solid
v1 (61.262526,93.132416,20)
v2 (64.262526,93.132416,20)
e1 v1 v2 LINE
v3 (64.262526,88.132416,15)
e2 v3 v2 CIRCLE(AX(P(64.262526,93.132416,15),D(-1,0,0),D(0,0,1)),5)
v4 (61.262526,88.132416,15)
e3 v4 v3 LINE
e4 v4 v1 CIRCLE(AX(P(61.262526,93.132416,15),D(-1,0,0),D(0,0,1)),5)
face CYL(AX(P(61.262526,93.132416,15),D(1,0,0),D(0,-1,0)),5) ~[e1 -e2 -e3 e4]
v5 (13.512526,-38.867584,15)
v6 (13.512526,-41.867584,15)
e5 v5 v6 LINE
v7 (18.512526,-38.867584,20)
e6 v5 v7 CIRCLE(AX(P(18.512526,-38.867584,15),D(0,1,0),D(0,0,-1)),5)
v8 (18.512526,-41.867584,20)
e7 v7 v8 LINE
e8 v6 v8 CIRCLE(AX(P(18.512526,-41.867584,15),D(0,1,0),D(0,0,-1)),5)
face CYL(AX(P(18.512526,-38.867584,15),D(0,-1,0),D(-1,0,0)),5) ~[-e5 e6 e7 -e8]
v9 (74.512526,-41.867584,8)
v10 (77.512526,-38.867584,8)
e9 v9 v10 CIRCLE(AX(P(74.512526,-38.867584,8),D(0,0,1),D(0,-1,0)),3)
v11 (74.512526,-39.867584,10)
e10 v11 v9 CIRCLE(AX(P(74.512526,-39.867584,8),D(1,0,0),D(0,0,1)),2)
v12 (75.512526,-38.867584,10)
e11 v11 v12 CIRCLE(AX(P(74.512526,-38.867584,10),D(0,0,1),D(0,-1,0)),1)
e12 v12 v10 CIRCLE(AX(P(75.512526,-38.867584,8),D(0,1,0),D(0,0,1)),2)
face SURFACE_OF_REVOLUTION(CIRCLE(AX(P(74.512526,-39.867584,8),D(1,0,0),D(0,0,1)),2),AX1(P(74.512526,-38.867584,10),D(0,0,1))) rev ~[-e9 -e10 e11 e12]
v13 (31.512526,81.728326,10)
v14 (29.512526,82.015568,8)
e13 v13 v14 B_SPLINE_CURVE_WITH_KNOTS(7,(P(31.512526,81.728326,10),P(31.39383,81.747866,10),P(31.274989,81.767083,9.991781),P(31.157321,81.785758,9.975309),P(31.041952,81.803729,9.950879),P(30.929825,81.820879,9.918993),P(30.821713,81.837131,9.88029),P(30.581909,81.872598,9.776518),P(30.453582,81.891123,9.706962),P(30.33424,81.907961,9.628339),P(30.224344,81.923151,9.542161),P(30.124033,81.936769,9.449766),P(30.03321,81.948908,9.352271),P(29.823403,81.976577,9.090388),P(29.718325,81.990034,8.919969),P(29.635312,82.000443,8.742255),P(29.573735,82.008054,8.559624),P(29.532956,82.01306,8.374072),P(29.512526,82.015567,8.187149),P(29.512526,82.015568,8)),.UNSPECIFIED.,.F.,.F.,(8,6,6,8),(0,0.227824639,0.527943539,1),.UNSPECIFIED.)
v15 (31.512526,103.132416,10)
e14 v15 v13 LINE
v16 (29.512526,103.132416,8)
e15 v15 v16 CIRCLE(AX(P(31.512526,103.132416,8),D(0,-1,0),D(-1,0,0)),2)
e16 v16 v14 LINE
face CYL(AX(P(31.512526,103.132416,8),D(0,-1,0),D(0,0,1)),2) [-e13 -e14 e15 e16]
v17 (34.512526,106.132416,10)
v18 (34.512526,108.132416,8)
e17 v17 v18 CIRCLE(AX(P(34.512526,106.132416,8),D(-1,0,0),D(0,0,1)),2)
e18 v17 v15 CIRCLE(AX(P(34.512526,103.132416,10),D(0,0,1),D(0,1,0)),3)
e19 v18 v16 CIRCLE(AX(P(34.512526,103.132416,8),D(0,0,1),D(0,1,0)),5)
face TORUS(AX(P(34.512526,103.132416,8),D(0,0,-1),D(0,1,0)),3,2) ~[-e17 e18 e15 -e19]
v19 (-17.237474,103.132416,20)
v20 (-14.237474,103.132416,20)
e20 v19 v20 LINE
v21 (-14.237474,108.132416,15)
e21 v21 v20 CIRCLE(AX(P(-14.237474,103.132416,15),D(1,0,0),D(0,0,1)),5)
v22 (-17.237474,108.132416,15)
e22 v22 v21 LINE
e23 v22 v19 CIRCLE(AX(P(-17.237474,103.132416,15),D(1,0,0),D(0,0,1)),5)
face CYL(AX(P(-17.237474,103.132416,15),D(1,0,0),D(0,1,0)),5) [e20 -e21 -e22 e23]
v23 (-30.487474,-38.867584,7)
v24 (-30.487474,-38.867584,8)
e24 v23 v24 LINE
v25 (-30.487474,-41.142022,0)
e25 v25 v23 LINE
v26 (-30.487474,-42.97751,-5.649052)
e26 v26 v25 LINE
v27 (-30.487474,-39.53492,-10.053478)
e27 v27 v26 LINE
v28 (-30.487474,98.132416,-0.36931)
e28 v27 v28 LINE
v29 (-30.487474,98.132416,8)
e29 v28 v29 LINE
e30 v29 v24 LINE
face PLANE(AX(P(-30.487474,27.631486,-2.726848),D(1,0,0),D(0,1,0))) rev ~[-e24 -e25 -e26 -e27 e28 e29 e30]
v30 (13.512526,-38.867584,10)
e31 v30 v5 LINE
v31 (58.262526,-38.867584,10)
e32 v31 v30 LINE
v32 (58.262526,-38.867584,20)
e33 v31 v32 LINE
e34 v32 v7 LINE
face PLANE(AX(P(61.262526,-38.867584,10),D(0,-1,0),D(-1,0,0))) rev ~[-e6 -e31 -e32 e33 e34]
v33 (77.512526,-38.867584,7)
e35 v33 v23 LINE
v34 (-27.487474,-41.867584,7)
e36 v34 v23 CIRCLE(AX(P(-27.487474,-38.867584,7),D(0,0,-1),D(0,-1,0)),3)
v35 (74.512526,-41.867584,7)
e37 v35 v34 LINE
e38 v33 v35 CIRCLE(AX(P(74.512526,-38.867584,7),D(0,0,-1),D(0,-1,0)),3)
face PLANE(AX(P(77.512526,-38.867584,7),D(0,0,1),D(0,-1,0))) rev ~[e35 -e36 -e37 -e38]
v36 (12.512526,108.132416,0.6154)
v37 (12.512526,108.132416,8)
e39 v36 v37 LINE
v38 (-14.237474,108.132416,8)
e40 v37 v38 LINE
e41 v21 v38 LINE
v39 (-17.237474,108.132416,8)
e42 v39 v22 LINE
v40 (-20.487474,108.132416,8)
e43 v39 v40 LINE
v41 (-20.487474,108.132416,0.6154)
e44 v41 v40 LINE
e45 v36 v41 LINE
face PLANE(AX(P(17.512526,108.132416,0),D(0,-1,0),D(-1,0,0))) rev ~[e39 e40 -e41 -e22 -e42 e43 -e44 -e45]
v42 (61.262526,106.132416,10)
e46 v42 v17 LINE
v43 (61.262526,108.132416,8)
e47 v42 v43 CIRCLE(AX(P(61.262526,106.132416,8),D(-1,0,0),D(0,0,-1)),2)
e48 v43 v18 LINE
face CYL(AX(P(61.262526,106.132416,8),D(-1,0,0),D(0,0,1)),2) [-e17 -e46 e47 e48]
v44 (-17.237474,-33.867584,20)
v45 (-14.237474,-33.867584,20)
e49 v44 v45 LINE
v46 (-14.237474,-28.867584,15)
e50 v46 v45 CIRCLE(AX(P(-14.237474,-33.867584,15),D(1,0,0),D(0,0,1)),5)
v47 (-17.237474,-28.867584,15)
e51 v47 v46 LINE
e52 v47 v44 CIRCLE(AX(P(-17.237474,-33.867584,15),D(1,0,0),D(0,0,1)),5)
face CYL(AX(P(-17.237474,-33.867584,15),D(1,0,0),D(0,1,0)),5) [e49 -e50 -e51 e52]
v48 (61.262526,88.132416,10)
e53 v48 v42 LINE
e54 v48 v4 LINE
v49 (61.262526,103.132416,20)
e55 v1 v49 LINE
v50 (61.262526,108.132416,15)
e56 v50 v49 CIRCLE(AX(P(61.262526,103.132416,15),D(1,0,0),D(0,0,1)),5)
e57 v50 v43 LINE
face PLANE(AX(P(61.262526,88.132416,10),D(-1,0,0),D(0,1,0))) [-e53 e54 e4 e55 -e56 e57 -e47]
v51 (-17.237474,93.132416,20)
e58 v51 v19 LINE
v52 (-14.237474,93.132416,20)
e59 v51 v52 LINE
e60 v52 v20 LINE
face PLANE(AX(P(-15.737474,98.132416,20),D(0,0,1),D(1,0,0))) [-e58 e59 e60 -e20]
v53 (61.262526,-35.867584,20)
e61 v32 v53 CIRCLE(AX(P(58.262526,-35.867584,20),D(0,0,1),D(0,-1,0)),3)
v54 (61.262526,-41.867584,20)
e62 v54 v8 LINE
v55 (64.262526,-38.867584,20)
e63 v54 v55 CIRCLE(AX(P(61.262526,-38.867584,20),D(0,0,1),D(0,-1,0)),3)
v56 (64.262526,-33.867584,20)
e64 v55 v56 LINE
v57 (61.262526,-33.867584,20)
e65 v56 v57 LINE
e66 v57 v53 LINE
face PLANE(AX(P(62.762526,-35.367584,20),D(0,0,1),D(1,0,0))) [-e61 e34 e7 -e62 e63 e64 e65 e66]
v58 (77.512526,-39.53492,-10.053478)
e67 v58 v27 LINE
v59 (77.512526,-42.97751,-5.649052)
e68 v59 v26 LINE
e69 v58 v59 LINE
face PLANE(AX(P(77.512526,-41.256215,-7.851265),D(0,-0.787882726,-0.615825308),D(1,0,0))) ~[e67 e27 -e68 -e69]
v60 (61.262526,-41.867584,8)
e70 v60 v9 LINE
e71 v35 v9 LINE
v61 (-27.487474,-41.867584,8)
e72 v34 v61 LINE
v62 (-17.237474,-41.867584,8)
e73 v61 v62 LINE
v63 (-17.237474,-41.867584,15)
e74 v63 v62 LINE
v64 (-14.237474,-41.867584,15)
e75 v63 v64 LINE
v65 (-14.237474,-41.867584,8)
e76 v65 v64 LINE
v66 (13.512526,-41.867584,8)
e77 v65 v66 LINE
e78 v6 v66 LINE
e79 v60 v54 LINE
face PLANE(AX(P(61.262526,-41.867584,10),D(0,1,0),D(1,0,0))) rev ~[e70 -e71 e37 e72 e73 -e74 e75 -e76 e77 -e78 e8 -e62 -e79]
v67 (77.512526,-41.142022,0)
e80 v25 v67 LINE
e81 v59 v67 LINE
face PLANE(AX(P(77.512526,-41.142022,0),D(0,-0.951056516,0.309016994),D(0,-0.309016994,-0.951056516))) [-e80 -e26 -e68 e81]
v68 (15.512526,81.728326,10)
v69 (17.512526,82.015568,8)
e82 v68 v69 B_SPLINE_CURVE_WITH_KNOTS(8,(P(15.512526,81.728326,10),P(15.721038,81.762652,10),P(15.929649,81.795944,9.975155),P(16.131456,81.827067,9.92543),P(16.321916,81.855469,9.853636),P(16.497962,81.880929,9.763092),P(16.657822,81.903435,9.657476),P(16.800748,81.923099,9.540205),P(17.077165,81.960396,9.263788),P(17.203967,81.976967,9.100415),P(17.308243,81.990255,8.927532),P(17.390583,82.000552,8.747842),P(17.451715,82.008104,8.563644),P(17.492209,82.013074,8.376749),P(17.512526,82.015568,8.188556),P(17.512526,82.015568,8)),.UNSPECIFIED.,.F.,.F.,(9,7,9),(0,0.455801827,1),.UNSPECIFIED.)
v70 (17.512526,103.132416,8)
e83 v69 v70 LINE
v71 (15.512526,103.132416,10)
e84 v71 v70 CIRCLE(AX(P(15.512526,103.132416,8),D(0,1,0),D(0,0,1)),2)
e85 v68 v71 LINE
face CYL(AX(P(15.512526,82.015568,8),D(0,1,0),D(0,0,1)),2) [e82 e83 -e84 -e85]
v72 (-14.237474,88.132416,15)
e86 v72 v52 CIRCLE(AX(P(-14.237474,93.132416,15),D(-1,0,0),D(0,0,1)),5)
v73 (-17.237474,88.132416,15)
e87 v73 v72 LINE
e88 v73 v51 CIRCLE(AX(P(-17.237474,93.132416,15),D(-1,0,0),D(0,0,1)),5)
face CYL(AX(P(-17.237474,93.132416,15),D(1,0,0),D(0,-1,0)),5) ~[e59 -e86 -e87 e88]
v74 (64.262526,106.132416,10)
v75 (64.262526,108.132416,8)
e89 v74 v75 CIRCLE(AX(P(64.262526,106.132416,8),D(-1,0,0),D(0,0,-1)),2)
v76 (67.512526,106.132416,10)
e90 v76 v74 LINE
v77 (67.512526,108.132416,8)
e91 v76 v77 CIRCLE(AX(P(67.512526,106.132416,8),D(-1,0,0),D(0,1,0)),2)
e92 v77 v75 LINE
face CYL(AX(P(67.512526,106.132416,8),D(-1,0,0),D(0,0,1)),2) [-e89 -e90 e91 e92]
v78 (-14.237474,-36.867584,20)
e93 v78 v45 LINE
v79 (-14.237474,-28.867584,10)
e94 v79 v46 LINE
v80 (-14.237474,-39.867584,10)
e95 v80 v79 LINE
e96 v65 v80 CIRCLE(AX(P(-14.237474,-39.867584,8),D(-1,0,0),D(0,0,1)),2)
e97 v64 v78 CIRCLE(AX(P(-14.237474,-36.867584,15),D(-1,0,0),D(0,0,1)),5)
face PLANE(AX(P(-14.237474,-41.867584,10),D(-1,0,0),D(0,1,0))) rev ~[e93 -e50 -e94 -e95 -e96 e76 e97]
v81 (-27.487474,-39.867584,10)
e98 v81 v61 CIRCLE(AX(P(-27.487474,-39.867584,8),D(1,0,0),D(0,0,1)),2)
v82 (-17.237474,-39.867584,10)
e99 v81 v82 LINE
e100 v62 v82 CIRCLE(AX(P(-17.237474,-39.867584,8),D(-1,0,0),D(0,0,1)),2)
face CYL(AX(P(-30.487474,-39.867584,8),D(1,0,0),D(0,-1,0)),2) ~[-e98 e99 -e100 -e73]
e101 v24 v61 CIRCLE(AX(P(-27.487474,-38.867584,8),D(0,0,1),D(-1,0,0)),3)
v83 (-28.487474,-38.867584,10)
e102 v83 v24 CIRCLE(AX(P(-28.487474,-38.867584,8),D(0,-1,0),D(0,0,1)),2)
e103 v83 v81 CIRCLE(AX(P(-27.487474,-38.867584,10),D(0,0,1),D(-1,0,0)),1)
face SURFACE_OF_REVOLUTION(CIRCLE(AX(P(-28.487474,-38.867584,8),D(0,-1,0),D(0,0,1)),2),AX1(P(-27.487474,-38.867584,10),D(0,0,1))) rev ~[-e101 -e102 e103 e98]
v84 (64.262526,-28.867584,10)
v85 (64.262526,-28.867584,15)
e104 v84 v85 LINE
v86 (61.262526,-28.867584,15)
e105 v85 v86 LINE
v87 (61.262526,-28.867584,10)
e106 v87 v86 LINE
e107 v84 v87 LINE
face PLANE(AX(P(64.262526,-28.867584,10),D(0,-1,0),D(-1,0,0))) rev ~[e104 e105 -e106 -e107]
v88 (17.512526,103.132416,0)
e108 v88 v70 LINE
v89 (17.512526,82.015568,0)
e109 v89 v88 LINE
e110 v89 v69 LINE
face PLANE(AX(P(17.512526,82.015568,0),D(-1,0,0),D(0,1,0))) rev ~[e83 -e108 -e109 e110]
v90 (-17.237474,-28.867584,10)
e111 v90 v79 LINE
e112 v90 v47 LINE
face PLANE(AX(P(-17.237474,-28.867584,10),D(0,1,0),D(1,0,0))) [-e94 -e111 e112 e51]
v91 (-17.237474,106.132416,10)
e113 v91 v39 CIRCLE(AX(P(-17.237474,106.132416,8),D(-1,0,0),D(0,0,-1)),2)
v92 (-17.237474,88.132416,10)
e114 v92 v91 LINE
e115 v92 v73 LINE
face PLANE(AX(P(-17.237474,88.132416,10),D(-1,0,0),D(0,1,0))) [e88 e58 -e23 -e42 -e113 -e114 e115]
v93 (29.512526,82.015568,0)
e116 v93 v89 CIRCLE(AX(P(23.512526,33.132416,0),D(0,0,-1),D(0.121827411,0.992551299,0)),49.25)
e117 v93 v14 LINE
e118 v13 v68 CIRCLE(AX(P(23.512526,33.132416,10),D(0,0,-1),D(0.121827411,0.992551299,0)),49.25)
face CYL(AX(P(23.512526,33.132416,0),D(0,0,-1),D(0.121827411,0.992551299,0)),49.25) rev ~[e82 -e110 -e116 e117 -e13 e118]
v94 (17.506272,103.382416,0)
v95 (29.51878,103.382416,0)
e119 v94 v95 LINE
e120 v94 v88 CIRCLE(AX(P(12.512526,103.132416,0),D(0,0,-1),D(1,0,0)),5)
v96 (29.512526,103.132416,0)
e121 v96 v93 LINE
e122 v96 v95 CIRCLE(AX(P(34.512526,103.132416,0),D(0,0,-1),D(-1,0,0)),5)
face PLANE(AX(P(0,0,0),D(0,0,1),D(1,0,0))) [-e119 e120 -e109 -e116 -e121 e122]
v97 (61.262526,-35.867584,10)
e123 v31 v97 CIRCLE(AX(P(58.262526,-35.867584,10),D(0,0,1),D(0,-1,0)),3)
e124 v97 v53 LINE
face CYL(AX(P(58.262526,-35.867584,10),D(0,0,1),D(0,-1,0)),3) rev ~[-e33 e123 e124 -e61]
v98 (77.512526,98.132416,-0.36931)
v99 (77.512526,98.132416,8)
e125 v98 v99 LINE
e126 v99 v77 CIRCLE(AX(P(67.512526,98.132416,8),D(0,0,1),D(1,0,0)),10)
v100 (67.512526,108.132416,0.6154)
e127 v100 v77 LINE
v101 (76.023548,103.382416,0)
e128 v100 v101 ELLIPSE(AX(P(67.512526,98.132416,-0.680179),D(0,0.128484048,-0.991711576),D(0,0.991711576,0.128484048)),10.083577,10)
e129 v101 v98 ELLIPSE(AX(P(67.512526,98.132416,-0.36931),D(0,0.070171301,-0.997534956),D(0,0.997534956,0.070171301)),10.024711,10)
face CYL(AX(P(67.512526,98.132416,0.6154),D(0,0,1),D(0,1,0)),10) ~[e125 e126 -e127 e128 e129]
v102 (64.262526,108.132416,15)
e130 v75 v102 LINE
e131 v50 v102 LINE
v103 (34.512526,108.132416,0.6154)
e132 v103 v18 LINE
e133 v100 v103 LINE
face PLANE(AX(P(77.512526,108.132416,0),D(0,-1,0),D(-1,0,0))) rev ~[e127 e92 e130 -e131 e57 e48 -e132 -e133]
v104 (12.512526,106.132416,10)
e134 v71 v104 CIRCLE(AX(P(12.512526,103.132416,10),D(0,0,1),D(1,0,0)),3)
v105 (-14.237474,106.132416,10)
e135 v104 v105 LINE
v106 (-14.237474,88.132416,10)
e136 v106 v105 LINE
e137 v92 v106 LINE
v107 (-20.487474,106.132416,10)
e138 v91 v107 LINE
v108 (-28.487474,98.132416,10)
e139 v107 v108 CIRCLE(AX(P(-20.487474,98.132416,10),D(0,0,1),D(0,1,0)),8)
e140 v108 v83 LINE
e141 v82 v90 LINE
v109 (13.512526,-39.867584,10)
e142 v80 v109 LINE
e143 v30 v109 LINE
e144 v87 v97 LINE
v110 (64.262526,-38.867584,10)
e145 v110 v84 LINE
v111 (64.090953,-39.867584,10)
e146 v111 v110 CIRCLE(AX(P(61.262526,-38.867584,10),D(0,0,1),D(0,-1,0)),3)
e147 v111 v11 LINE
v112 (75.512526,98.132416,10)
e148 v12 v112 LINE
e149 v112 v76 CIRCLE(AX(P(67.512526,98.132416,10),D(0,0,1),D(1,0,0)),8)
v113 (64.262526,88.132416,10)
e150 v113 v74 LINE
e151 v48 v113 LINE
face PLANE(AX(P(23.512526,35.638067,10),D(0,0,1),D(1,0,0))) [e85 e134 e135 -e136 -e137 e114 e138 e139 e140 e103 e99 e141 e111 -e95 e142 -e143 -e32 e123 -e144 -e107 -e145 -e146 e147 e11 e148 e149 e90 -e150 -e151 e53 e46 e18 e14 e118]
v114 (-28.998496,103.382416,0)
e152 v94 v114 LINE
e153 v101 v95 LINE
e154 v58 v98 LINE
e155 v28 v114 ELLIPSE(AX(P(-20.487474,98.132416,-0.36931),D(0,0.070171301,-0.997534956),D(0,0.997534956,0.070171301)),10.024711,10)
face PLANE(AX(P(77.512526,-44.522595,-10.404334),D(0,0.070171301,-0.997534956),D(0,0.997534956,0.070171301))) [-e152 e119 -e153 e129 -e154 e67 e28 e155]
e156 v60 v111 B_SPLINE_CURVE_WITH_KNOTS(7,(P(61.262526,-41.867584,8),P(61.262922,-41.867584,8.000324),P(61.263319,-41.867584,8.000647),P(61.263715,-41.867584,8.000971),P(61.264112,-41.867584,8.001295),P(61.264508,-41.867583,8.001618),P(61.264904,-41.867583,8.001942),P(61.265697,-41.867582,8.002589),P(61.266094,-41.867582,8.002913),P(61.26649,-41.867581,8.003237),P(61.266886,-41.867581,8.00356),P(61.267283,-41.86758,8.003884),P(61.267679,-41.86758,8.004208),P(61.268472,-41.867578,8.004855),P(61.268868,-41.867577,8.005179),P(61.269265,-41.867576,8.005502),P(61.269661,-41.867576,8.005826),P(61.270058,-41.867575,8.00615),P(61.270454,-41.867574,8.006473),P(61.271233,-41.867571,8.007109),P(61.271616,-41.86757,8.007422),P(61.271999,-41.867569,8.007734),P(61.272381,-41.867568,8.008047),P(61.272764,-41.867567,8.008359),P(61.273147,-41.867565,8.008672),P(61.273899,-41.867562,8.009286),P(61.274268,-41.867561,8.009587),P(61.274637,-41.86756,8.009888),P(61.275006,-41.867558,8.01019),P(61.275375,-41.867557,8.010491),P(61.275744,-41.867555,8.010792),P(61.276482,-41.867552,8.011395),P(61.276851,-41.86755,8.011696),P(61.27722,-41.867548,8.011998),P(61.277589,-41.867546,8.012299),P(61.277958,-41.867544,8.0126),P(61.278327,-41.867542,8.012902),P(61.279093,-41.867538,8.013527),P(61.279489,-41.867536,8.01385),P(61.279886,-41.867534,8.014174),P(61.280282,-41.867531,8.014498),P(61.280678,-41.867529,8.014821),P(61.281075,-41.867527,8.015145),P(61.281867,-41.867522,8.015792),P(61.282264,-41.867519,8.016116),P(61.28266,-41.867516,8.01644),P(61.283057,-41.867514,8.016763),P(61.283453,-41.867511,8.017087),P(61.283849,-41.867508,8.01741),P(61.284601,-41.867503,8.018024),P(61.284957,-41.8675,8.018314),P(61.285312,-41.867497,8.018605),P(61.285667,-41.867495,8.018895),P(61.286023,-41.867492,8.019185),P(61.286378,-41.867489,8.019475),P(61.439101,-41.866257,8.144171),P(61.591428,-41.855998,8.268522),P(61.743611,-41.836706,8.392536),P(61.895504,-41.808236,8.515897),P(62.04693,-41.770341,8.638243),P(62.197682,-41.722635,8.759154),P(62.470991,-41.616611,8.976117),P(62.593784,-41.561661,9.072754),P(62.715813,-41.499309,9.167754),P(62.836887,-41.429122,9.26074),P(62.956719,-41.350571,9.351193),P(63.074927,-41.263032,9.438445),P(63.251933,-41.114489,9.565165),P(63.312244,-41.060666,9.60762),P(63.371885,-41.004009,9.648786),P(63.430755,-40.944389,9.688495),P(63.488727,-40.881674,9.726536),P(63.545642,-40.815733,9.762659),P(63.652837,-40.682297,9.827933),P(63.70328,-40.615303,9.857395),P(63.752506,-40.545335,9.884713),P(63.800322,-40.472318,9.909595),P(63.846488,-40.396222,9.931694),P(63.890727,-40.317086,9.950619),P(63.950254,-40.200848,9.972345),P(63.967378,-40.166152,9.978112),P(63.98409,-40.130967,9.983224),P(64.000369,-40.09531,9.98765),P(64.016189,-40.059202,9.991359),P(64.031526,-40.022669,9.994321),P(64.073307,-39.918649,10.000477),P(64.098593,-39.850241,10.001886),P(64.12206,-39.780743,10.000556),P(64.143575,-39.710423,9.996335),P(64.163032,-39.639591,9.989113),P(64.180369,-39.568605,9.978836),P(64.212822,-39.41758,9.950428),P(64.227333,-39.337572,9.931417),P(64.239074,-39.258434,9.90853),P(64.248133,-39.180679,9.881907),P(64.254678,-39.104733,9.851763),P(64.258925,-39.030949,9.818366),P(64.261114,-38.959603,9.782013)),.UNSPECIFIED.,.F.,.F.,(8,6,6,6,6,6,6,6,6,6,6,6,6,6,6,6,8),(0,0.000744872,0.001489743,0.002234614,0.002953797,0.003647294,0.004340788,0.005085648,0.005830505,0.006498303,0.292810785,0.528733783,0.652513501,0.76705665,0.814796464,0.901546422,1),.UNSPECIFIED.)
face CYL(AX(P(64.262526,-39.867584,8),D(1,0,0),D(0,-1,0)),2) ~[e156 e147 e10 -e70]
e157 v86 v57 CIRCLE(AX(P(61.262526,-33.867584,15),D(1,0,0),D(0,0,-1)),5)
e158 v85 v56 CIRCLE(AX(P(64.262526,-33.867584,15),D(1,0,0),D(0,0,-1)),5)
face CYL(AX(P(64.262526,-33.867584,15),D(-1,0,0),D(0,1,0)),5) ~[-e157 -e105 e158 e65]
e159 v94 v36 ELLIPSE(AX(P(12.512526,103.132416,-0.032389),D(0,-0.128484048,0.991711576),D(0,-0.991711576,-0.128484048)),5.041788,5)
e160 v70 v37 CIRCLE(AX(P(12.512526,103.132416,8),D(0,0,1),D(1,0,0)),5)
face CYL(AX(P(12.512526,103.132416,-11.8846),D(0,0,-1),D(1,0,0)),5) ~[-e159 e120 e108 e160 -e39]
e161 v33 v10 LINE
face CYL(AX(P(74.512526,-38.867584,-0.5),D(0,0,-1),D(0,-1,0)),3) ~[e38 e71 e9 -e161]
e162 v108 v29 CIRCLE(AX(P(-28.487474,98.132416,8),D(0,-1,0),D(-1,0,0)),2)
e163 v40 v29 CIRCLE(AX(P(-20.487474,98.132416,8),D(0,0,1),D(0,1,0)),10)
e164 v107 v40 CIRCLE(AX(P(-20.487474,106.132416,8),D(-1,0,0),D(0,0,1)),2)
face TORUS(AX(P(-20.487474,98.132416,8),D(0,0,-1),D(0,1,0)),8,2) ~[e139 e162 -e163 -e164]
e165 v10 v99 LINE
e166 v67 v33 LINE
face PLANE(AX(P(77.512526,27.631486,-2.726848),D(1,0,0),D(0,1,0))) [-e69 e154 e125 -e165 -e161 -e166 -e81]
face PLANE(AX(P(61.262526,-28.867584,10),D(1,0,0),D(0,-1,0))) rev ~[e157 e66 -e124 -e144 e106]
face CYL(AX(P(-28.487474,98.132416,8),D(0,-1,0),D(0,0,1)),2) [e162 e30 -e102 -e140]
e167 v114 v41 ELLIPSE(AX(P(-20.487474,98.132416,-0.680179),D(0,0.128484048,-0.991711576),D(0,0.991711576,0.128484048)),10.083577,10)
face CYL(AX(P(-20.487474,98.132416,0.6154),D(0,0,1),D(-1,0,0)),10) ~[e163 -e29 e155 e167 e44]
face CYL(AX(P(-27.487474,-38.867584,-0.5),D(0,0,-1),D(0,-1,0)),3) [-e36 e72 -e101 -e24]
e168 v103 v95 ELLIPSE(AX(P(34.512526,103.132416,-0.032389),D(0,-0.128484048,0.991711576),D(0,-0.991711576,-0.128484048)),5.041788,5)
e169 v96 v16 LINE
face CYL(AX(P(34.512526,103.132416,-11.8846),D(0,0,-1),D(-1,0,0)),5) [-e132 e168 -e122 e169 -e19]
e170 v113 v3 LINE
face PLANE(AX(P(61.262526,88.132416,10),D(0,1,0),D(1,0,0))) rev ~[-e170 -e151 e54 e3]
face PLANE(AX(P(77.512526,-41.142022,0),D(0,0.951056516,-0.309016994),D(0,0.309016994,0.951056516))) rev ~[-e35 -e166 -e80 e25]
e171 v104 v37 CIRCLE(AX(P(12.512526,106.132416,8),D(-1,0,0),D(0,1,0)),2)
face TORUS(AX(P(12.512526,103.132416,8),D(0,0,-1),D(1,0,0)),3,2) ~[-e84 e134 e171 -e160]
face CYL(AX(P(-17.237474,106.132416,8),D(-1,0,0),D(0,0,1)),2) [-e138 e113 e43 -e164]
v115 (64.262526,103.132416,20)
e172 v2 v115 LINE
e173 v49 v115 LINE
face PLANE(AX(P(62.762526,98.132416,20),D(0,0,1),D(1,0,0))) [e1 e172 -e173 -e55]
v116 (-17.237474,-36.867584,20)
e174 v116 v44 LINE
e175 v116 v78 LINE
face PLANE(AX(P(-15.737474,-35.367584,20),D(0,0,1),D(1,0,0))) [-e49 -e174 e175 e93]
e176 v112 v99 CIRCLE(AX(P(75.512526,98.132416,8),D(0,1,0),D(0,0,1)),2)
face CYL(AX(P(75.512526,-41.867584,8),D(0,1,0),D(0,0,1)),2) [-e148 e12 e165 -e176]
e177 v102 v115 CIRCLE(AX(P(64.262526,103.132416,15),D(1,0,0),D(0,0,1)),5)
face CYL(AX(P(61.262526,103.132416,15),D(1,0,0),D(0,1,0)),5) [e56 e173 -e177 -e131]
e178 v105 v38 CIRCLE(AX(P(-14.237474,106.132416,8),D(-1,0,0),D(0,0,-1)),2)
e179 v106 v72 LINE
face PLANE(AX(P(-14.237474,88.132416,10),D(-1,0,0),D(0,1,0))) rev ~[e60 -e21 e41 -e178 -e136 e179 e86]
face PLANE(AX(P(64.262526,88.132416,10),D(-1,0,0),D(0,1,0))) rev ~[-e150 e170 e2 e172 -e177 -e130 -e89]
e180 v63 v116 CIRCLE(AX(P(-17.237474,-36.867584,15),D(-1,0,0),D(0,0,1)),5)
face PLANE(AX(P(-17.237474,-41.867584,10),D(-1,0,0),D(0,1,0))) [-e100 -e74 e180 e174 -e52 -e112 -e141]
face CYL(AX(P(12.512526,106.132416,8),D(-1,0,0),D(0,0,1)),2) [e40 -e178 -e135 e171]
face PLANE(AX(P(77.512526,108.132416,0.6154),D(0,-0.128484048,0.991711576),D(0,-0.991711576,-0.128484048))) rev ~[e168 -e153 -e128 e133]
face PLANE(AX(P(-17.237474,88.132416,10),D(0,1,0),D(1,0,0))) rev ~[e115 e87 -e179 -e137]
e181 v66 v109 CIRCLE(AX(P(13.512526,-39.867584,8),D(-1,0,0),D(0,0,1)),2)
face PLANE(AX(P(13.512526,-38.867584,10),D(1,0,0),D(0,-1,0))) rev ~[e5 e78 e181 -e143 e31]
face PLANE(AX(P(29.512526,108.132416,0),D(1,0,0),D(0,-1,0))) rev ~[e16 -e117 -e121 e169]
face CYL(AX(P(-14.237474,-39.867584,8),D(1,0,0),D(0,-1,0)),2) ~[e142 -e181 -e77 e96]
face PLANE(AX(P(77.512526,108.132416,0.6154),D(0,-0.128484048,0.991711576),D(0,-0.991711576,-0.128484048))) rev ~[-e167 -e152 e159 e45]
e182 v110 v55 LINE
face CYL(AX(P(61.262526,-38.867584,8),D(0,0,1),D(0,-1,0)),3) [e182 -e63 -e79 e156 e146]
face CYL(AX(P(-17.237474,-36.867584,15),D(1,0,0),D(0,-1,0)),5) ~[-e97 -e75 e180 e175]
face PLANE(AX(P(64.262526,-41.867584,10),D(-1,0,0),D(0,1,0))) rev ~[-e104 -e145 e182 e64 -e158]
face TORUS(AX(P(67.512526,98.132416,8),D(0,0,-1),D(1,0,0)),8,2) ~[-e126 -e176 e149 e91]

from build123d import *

# Parameters (mm, degrees)
F1_DEPTH      = 10
F3_DEPTH      = 10
F5_DEPTH      = 112.1
F6_DEPTH      = 112.8
F7_DEPTH      = 108
F2_W          = 3
F2_H          = 20
F2_H_2        = 13
F8_DEPTH      = 10
F9_T4_DEPTH   = 34.3846000786
F9_T9_DEPTH   = 34.3846000786
F10_R         = 10
F11_R         = 5
F12_R         = 2
F13_R         = 3
F14_T2_ANGLE  = 90
F14_T4_ANGLE  = 90
F14_T8_DEPTH  = 10.5
F14_T13_DEPTH = 10.5
F15_SIZE      = 5


# Not quite as in the source:
# - a fillet or chamfer that OpenCascade refuses, or shapes differently, is made with other operations: its cross-section is extruded or revolved along the edge and cut away or added
# - a feature names something its author has since deleted; it is built from what else it names


with BuildPart() as f1:
    # F0 (on Top) → F1 (new body)
    with BuildSketch(Plane.XY):
        with BuildLine():
            Line((17.5125259459, 108.1324160099), (-30.4874740541, 108.1324160099))
            Line((-30.4874740541, 108.1324160099), (-30.4874740541, -41.8675839901))
            Line((-30.4874740541, -41.8675839901), (77.5125259459, -41.8675839901))
            Line((77.5125259459, -41.8675839901), (77.5125259459, 108.1324160099))
            Line((77.5125259459, 108.1324160099), (29.5125259459, 108.1324160099))
            Line((29.5125259459, 108.1324160099), (29.5125259459, 82.0155675041))
            ThreePointArc((29.5125259459, 82.0155675041), (23.5125259459, -16.1175839901), (17.5125259459, 82.0155675041))
            Line((17.5125259459, 82.0155675041), (17.5125259459, 108.1324160099))
        make_face()
    extrude(amount=F1_DEPTH)

    # F2 (on face) → F3 (join)
    with BuildSketch(Plane.XY.offset(10)):
        Polygon((13.5125259459, -41.8675839901), (23.5125259459, -41.8675839901), (61.2625259459, -41.8675839901), (61.2625259459, -38.8675839901), (13.5125259459, -38.8675839901), align=None)
    extrude(amount=F3_DEPTH)

    # F4 (on face) → F5 (cut)
    with BuildSketch(Plane.YZ.offset(77.5125259459)):
        Polygon((-38.8675839901, 7), (-41.8675839901, 7), (-41.8675839901, 0), (-41.1420218637, 0), align=None)
    extrude(amount=-F5_DEPTH, mode=Mode.SUBTRACT)

    # F4 (on face) → F6 (cut)
    with BuildSketch(Plane.YZ.offset(77.5125259459)):
        Polygon((108.1324160099, 0), (108.1324160099, 0.6153999214), (103.3824160099, 0), align=None)
    extrude(amount=-F6_DEPTH, mode=Mode.SUBTRACT)

    # F4 (on face) → F7 (join)
    with BuildSketch(Plane.YZ.offset(77.5125259459)):
        Polygon((-38.8675839901, 0), (-41.1420218637, 0), (-44.5225949872, -10.4043342482), (103.3824160099, 0), (-36.5935839901, 0), align=None)
    extrude(amount=-F7_DEPTH)

    # F2 (on face) → F8 (join)
    with BuildSketch(Plane.XY.offset(10)):
        with Locations((-15.7374740541, 98.1324160099)):
            Rectangle(F2_W, F2_H)
        with Locations((62.7625259459, 98.1324160099)):
            Rectangle(F2_W, F2_H)
        with Locations((-15.7374740541, -35.3675839901)):
            Rectangle(F2_W, F2_H_2)
        Polygon((61.2625259459, -38.8675839901), (61.2625259459, -41.8675839901), (64.2625259459, -41.8675839901), (64.2625259459, -28.8675839901), (61.2625259459, -28.8675839901), align=None)
    extrude(amount=F8_DEPTH)

    # F9: fillet of radius 5 on 2 edges, made by hand


with BuildPart() as f9_tool2:
    # F9_s3 → F9_t4 (new body)
    with BuildSketch(Plane.XY.offset(-11.8846000786)):
        with BuildLine():
            ThreePointArc((17.5125259459, 103.1324160099), (16.0480598518, 106.6679499158), (12.5125259459, 108.1324160099))
            Line((12.5125259459, 108.1324160099), (17.5125259459, 108.1324160099))
            Line((17.5125259459, 108.1324160099), (17.5125259459, 103.1324160099))
        make_face()
    extrude(amount=F9_T4_DEPTH)

    split(bisect_by=Plane.XY, keep=Keep.TOP)


with BuildPart() as f1_1:
    add(f1.part)

    # F9_t1: cut F9_tool2
    add(f9_tool2.part, mode=Mode.SUBTRACT)


with BuildPart() as f9_tool7:
    # F9_s8 → F9_t9 (new body)
    with BuildSketch(Plane.XY.offset(-11.8846000786)):
        with BuildLine():
            ThreePointArc((29.5125259459, 103.1324160099), (30.97699204, 106.6679499158), (34.5125259459, 108.1324160099))
            Line((34.5125259459, 108.1324160099), (29.5125259459, 108.1324160099))
            Line((29.5125259459, 108.1324160099), (29.5125259459, 103.1324160099))
        make_face()
    extrude(amount=F9_T9_DEPTH)

    split(bisect_by=Plane.XY, keep=Keep.TOP)


with BuildPart() as f1_2:
    add(f1_1.part)

    # F9_t6: cut F9_tool7
    add(f9_tool7.part, mode=Mode.SUBTRACT)

    # F10
    f10_edges = [f1_2.edges().sort_by_distance(p)[0] for p in [
        (77.512526, 108.132416, 5.3077),
        (-30.487474, 108.132416, 5.3077),
    ]]
    fillet(f10_edges, radius=F10_R)

    # F11
    f11_edges = [f1_2.edges().sort_by_distance(p)[0] for p in [
        (-15.737474, 88.132416, 20),
        (-15.737474, 108.132416, 20),
        (62.762526, 88.132416, 20),
        (62.762526, 108.132416, 20),
        (62.762526, -28.867584, 20),
        (-15.737474, -28.867584, 20),
        (-15.737474, -41.867584, 20),
        (13.512526, -40.367584, 20),
    ]]
    fillet(f11_edges, radius=F11_R)

    # F12
    f12_edges = [f1_2.edges().sort_by_distance(p)[0] for p in [
        (77.512526, 28.132416, 10),
        (-0.362474, -41.867584, 10),
        (70.887526, -41.867584, 10),
        (-23.862474, -41.867584, 10),
        (-30.487474, 28.132416, 10),
        (-27.558542, 105.203484, 10),
        (-18.862474, 108.132416, 10),
        (-0.862474, 108.132416, 10),
        (47.887526, 108.132416, 10),
        (74.583594, 105.203484, 10),
        (65.887526, 108.132416, 10),
        (30.976992, 106.66795, 10),
        (29.512526, 92.573992, 10),
        (17.512526, 92.573992, 10),
        (16.04806, 106.66795, 10),
    ]]
    fillet(f12_edges, radius=F12_R)

    # F13
    f13_edges = [f1_2.edges().sort_by_distance(p)[0] for p in [
        (64.262526, -41.867584, 15),
        (61.262526, -38.867584, 15),
    ]]
    fillet(f13_edges, radius=F13_R)

    # F14: fillet of radius 3 on 2 edges, made by hand

    # F14_s1 → F14_t2 (revolve, cut)
    with BuildSketch(Plane.XZ.offset(38.8675839901)):
        with BuildLine():
            ThreePointArc((-28.4874740541, 10), (-29.9016876165, 9.4142135624), (-30.4874740541, 8))
            Line((-30.4874740541, 8), (-30.4874740541, 10))
            Line((-30.4874740541, 10), (-28.4874740541, 10))
        make_face()
    revolve(axis=Axis((-27.4874740541, -38.8675839901, 10), (0, 0, 1)), revolution_arc=F14_T2_ANGLE, mode=Mode.SUBTRACT)

    # F14_s3 → F14_t4 (revolve, cut)
    with BuildSketch(Plane.YZ.offset(74.5125259459)):
        with BuildLine():
            ThreePointArc((-39.8675839901, 10), (-41.2817975525, 9.4142135624), (-41.8675839901, 8))
            Line((-41.8675839901, 8), (-41.8675839901, 10))
            Line((-41.8675839901, 10), (-39.8675839901, 10))
        make_face()
    revolve(axis=Axis((74.5125259459, -38.8675839901, 10), (0, 0, 1)), revolution_arc=F14_T4_ANGLE, mode=Mode.SUBTRACT)


with BuildPart() as f14_tool6:
    # F14_s7 → F14_t8 (new body)
    with BuildSketch(Plane.XY.offset(-0.5)):
        with BuildLine():
            ThreePointArc((74.5125259459, -41.8675839901), (76.6338462895, -40.9889043337), (77.5125259459, -38.8675839901))
            Line((77.5125259459, -38.8675839901), (77.5125259459, -41.8675839901))
            Line((77.5125259459, -41.8675839901), (74.5125259459, -41.8675839901))
        make_face()
    extrude(amount=F14_T8_DEPTH)

    split(bisect_by=Plane(origin=(0, -37.2133083672, 12.0913368505), x_dir=(1, 0, 0), z_dir=(0, -0.9510565163, 0.3090169944)), keep=Keep.TOP)


with BuildPart() as f1_3:
    add(f1_2.part)

    # F14_t5: cut F14_tool6
    add(f14_tool6.part, mode=Mode.SUBTRACT)


with BuildPart() as f14_tool11:
    # F14_s12 → F14_t13 (new body)
    with BuildSketch(Plane.XY.offset(-0.5)):
        with BuildLine():
            ThreePointArc((-27.4874740541, -41.8675839901), (-29.6087943977, -40.9889043337), (-30.4874740541, -38.8675839901))
            Line((-30.4874740541, -38.8675839901), (-30.4874740541, -41.8675839901))
            Line((-30.4874740541, -41.8675839901), (-27.4874740541, -41.8675839901))
        make_face()
    extrude(amount=F14_T13_DEPTH)

    split(bisect_by=Plane(origin=(0, -37.2133083672, 12.0913368505), x_dir=(1, 0, 0), z_dir=(0, -0.9510565163, 0.3090169944)), keep=Keep.TOP)


with BuildPart() as f1_4:
    add(f1_3.part)

    # F14_t10: cut F14_tool11
    add(f14_tool11.part, mode=Mode.SUBTRACT)

    # F15
    f15_edges = [f1_4.edges().sort_by_distance(p)[0] for p in [
        (23.512526, -44.522595, -10.404334),
    ]]
    chamfer(f15_edges, length=F15_SIZE)


solid = f1_4.part
